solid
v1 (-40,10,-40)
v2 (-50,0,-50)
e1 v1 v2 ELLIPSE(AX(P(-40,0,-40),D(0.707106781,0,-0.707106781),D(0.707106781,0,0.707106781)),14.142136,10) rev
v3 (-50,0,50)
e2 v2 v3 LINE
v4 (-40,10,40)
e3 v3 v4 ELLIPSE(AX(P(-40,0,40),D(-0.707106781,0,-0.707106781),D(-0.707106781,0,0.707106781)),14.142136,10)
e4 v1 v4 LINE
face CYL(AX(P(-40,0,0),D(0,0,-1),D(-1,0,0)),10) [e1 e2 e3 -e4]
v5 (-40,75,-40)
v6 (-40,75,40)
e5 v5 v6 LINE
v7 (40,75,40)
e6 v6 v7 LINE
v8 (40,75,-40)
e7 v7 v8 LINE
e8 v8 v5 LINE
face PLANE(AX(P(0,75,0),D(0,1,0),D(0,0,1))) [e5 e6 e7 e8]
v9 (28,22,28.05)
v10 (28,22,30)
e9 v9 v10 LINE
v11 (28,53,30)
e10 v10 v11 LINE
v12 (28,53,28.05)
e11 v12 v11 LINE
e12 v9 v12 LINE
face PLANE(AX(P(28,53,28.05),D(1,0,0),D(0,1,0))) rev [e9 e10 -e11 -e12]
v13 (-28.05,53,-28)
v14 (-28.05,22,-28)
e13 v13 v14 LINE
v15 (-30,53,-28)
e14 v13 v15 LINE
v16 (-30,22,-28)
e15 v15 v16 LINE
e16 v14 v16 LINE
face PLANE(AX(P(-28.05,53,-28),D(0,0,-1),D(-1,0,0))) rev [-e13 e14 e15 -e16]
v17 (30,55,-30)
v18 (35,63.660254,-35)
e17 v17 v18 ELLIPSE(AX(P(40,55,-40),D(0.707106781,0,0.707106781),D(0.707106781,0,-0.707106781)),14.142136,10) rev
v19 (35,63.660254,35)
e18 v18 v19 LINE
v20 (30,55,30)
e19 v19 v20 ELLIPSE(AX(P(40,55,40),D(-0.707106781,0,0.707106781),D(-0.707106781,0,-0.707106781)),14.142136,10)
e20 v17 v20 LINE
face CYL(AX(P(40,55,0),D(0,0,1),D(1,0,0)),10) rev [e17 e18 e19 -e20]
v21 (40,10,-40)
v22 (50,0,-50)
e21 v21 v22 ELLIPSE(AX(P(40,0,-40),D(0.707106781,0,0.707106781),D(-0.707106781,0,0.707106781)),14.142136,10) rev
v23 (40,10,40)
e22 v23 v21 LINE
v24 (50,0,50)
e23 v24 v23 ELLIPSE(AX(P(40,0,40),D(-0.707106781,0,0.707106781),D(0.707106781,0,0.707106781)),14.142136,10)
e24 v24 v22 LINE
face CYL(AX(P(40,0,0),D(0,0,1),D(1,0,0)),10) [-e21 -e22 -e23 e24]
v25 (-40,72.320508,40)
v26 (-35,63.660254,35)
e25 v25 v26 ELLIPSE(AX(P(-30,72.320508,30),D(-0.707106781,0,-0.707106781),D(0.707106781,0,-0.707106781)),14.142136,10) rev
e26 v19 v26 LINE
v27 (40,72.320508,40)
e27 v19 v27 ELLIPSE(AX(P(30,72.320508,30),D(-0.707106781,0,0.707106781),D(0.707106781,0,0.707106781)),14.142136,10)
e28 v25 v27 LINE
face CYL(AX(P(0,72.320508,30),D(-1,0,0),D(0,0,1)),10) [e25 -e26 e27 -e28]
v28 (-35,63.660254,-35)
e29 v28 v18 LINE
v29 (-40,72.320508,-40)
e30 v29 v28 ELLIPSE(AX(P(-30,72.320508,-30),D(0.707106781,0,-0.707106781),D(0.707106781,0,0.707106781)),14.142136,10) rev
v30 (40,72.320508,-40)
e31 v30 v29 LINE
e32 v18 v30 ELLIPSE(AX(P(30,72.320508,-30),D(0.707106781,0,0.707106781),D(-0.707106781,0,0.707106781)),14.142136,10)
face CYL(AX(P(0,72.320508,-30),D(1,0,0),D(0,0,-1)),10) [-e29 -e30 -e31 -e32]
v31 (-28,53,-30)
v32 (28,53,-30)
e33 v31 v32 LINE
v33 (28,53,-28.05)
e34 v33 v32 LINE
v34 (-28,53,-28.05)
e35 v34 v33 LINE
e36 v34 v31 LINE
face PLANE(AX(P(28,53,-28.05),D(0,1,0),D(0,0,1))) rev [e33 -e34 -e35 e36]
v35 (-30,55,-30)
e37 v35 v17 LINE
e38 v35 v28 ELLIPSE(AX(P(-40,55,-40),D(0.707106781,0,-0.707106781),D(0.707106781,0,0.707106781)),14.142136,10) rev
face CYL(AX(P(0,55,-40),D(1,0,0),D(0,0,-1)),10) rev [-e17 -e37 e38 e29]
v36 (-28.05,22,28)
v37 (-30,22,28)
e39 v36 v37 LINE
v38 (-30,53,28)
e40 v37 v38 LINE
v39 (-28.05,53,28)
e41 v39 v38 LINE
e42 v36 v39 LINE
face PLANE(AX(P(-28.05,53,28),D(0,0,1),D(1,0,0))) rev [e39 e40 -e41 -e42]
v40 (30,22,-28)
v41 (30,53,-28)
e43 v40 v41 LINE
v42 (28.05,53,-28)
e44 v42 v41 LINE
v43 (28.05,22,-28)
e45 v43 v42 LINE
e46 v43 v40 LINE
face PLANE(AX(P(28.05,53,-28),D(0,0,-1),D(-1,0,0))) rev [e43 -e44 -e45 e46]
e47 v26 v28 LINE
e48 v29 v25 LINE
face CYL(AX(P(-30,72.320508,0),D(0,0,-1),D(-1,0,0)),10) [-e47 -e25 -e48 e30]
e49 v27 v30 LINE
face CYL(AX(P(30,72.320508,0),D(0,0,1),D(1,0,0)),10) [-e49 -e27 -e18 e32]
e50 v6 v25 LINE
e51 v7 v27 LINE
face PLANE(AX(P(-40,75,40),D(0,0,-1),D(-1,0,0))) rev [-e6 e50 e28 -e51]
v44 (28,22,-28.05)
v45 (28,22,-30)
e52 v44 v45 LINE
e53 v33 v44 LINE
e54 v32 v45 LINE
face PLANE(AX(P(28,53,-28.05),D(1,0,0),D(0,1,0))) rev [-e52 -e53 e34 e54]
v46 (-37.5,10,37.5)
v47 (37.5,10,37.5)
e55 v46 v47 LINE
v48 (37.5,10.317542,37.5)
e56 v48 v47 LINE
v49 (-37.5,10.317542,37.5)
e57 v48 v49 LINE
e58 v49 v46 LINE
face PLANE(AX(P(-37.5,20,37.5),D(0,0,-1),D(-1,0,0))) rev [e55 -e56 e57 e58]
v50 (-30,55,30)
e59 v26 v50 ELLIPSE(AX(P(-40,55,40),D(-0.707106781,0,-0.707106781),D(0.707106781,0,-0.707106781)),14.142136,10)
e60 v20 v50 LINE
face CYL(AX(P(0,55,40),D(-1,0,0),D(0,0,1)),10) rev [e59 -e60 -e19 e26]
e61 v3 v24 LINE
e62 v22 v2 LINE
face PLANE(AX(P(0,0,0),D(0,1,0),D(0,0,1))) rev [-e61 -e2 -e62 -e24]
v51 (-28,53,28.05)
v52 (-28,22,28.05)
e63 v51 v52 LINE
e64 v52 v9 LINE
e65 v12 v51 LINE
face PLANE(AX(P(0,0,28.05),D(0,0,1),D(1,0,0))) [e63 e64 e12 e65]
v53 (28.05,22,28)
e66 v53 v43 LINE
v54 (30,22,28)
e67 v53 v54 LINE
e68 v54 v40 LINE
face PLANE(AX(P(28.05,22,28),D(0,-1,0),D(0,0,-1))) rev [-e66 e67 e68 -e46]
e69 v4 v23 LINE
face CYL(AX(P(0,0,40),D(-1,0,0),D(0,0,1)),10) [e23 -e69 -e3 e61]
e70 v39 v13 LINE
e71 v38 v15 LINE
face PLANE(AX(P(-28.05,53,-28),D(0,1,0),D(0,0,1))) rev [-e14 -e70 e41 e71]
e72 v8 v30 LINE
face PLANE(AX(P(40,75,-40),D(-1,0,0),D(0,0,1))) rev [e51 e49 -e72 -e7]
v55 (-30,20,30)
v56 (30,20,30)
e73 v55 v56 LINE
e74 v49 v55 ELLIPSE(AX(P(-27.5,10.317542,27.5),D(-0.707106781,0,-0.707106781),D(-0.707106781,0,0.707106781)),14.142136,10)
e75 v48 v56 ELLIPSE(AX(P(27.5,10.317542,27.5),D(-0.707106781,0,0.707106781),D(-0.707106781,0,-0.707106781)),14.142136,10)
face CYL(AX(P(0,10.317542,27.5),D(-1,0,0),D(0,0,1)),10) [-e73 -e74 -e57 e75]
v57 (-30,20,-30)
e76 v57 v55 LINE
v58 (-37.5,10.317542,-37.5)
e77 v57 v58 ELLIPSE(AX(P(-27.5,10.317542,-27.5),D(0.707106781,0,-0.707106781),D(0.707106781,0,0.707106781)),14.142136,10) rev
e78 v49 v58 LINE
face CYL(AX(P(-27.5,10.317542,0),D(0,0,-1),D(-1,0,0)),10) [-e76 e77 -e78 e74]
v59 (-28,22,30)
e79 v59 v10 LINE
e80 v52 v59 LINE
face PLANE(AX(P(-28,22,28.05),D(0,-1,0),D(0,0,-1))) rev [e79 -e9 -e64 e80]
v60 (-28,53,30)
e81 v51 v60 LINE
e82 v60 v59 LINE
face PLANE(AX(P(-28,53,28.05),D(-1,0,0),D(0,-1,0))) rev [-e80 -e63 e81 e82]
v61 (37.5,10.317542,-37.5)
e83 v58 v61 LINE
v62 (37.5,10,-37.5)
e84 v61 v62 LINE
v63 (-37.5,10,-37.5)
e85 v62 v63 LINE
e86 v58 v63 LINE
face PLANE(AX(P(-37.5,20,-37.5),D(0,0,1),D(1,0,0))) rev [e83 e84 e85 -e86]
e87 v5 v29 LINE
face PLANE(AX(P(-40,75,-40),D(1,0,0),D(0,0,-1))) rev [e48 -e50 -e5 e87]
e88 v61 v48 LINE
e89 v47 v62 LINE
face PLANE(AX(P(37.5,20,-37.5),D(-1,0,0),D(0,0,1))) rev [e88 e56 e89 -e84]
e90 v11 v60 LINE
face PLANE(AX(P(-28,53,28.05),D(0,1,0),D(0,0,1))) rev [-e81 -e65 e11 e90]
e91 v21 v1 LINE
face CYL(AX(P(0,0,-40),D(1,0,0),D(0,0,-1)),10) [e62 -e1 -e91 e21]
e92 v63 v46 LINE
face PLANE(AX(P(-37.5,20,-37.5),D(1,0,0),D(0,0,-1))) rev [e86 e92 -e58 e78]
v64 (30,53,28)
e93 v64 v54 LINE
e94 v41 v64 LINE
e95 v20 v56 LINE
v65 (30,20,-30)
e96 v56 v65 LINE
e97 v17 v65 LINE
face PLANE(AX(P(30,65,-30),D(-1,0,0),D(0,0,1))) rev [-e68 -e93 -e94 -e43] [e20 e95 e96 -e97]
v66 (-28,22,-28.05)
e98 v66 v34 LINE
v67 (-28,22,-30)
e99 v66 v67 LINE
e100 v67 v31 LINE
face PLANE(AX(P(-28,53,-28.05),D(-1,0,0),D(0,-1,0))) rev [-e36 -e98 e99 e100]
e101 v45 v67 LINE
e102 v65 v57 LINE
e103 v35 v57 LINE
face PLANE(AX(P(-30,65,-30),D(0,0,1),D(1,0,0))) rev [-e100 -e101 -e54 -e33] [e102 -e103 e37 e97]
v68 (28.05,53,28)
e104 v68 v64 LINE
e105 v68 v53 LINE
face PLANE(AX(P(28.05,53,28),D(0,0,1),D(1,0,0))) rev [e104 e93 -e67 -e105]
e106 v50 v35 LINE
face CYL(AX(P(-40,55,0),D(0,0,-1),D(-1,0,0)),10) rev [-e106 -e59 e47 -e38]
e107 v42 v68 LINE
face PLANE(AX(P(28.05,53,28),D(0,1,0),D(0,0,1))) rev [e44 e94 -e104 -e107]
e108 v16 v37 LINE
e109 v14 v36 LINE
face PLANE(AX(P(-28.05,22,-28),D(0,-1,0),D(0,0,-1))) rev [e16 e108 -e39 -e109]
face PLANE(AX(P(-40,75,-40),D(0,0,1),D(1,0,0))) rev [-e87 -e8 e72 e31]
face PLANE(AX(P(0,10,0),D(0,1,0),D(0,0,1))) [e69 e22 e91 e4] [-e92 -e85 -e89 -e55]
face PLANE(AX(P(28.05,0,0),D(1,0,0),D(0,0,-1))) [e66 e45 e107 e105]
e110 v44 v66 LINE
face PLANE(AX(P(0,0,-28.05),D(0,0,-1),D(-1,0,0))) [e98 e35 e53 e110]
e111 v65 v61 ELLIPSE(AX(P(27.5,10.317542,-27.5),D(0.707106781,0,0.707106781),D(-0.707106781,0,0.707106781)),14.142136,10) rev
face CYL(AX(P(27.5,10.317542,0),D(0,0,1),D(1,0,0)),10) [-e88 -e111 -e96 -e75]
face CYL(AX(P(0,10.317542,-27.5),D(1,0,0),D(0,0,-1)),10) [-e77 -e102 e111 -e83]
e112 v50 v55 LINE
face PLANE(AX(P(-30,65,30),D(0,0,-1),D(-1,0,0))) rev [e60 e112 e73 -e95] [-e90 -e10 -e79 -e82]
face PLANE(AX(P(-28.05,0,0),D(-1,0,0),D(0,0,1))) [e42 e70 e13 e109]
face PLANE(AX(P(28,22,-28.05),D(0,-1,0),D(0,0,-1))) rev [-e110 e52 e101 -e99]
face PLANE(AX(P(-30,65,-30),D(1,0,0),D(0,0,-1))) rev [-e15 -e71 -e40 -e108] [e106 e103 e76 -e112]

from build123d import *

# Parameters (mm, degrees)
SKETCH2_W           = 100
SKETCH2_H           = 100
BOSS_EXTRUDE1_DEPTH = 10
SKETCH3_W           = 75
SKETCH3_H           = 75
BOSS_EXTRUDE2_DEPTH = 10
SKETCH4_W           = 60
SKETCH4_H           = 60
BOSS_EXTRUDE3_DEPTH = 45
SKETCH5_W           = 80
SKETCH5_H           = 80
BOSS_EXTRUDE4_DEPTH = 10
FILLET2_R           = 10
FILLET1_R           = 10
FILLET3_R           = 10
SKETCH6_W           = 56
SKETCH6_H           = 31
CUT_EXTRUDE1_DEPTH  = 1.95
CIRPATTERN2_COUNT   = 4


# Some blends are built 0.0001 mm under size
with BuildPart() as part:
    # Sketch2 → Boss-Extrude1 (new body)
    with BuildSketch(Plane(origin=(0, 0, 0), x_dir=(1, 0, 0), z_dir=(0, 1, 0))):
        Rectangle(SKETCH2_W, SKETCH2_H)
    extrude(amount=BOSS_EXTRUDE1_DEPTH)

    # Sketch3 → Boss-Extrude2 (add)
    with BuildSketch(Plane(origin=(0, 10, 0), x_dir=(1, 0, 0), z_dir=(0, 1, 0))):
        Rectangle(SKETCH3_W, SKETCH3_H)
    extrude(amount=BOSS_EXTRUDE2_DEPTH)

    # Sketch4 → Boss-Extrude3 (add)
    with BuildSketch(Plane(origin=(0, 20, 0), x_dir=(1, 0, 0), z_dir=(0, 1, 0))):
        Rectangle(SKETCH4_W, SKETCH4_H)
    extrude(amount=BOSS_EXTRUDE3_DEPTH)

    # Sketch5 → Boss-Extrude4 (add)
    with BuildSketch(Plane(origin=(0, 65, 0), x_dir=(1, 0, 0), z_dir=(0, 1, 0))):
        Rectangle(SKETCH5_W, SKETCH5_H)
    extrude(amount=BOSS_EXTRUDE4_DEPTH)

    # Fillet2
    # the kernel refuses this fillet: 10 mm, written as the material it takes off along each edge
    with BuildSketch(Plane(origin=(-50, 10, 75), x_dir=(1, 0, 0), z_dir=(0, 0, -1)), Plane(origin=(75, 10, 50), x_dir=(0, 0, -1), z_dir=(-1, 0, 0)), Plane(origin=(-75, 10, -50), x_dir=(0, 0, 1), z_dir=(1, 0, 0)), Plane(origin=(50, 10, -75), x_dir=(-1, 0, 0), z_dir=(0, 0, 1))) as fillet2_piece_1:
        with BuildLine():
            CenterArc((FILLET2_R, FILLET2_R), FILLET2_R, 180, 90)
            Line((0, FILLET2_R), (-FILLET2_R * 0.02, FILLET2_R))
            Line((-FILLET2_R * 0.02, FILLET2_R), (-FILLET2_R * 0.02, -FILLET2_R * 0.02))
            Line((-FILLET2_R * 0.02, -FILLET2_R * 0.02), (FILLET2_R, -FILLET2_R * 0.02))
            Line((FILLET2_R, -FILLET2_R * 0.02), (FILLET2_R, 0))
        make_face()
    extrude(amount=150, mode=Mode.SUBTRACT)
    with BuildSketch(Plane(origin=(-37.5, 20, 61.706145914), x_dir=(1, 0, 0), z_dir=(0, 0, -1)), Plane(origin=(-61.706145914, 20, -37.5), x_dir=(0, 0, 1), z_dir=(1, 0, 0)), Plane(origin=(37.5, 20, -61.706145914), x_dir=(-1, 0, 0), z_dir=(0, 0, 1)), Plane(origin=(61.706145914, 20, 37.5), x_dir=(0, 0, -1), z_dir=(-1, 0, 0))) as fillet2_piece_2:
        with BuildLine():
            CenterArc((10, 9.682458366), FILLET2_R, 180, 75.522487814)
            Line((0, 9.682458366), (-0.2, 9.682458366))
            Line((-0.2, 9.682458366), (-0.2, 0))
            Line((-0.2, 0), (0, -0.2))
            ThreePointArc((0, -0.2), (3.75, -0.2), (7.45, -0.193649167))
            Line((7.45, -0.193649167), (7.5, 0))
        make_face()
    extrude(amount=123.412291828, mode=Mode.SUBTRACT)

    # Fillet1
    fillet1_edges = [part.edges().sort_by_distance(p)[0] for p in [
        (30, 65, 0),
        (0, 65, -30),
        (-30, 65, 0),
        (0, 65, 30),
    ]]
    fillet(fillet1_edges, radius=FILLET1_R - 0.0001)  # a hair under: the kernel refuses the full size

    # Fillet3
    # the kernel refuses this fillet: 10 mm, written as the material it takes off along each edge
    with BuildSketch(Plane(origin=(58.301375851, 65, 40), x_dir=(0, -0.25881282131019395, -0.9659274939277055), z_dir=(-1, 0, 0)), Plane(origin=(-40, 65, 58.301375851), x_dir=(0.9659274939277057, -0.2588128213101933, 0), z_dir=(0, 0, -1)), Plane(origin=(-58.301375851, 65, -40), x_dir=(0, -0.2588128213101933, 0.9659274939277057), z_dir=(1, 0, 0)), Plane(origin=(40, 65, -58.301375851), x_dir=(-0.9659274939277057, -0.2588128213101933, 0), z_dir=(0, 0, 1))) as fillet3_piece_1:
        with BuildLine():
            CenterArc((7.764622652, -9.659249058), FILLET3_R, 105.000203777, 60.000165399)
            Line((-1.894652287, -7.071120845), (-2.860579781, -6.812308023))
            Line((-2.860579781, -6.812308023), (-0.965927494, 0.258812821))
            Line((-0.965927494, 0.258812821), (0.258812821, 0.965927494))
            ThreePointArc((0.258812821, 0.965927494), (0.258909414, 0.965901613), (4.917575367, 0.965924906))
            Line((4.917575367, 0.965924906), (5.176397847, 0))
        make_face()
    extrude(amount=116.602751703, mode=Mode.SUBTRACT)

    # Sketch6 → Cut-Extrude1 (cut)
    with BuildSketch(Plane.XY.offset(30)):
        with Locations((0, 37.5)):
            Rectangle(SKETCH6_W, SKETCH6_H)
    cut_extrude1 = extrude(amount=-CUT_EXTRUDE1_DEPTH, mode=Mode.SUBTRACT)

    # CirPattern2: Cut-Extrude1 ×4 about axis
    cirpattern2_axis = Axis((0, 0, 0), (0, 1, 0))
    for i in range(1, CIRPATTERN2_COUNT):
        add(cut_extrude1.rotate(cirpattern2_axis, i * 360 / CIRPATTERN2_COUNT), mode=Mode.SUBTRACT)


solid = part.part
